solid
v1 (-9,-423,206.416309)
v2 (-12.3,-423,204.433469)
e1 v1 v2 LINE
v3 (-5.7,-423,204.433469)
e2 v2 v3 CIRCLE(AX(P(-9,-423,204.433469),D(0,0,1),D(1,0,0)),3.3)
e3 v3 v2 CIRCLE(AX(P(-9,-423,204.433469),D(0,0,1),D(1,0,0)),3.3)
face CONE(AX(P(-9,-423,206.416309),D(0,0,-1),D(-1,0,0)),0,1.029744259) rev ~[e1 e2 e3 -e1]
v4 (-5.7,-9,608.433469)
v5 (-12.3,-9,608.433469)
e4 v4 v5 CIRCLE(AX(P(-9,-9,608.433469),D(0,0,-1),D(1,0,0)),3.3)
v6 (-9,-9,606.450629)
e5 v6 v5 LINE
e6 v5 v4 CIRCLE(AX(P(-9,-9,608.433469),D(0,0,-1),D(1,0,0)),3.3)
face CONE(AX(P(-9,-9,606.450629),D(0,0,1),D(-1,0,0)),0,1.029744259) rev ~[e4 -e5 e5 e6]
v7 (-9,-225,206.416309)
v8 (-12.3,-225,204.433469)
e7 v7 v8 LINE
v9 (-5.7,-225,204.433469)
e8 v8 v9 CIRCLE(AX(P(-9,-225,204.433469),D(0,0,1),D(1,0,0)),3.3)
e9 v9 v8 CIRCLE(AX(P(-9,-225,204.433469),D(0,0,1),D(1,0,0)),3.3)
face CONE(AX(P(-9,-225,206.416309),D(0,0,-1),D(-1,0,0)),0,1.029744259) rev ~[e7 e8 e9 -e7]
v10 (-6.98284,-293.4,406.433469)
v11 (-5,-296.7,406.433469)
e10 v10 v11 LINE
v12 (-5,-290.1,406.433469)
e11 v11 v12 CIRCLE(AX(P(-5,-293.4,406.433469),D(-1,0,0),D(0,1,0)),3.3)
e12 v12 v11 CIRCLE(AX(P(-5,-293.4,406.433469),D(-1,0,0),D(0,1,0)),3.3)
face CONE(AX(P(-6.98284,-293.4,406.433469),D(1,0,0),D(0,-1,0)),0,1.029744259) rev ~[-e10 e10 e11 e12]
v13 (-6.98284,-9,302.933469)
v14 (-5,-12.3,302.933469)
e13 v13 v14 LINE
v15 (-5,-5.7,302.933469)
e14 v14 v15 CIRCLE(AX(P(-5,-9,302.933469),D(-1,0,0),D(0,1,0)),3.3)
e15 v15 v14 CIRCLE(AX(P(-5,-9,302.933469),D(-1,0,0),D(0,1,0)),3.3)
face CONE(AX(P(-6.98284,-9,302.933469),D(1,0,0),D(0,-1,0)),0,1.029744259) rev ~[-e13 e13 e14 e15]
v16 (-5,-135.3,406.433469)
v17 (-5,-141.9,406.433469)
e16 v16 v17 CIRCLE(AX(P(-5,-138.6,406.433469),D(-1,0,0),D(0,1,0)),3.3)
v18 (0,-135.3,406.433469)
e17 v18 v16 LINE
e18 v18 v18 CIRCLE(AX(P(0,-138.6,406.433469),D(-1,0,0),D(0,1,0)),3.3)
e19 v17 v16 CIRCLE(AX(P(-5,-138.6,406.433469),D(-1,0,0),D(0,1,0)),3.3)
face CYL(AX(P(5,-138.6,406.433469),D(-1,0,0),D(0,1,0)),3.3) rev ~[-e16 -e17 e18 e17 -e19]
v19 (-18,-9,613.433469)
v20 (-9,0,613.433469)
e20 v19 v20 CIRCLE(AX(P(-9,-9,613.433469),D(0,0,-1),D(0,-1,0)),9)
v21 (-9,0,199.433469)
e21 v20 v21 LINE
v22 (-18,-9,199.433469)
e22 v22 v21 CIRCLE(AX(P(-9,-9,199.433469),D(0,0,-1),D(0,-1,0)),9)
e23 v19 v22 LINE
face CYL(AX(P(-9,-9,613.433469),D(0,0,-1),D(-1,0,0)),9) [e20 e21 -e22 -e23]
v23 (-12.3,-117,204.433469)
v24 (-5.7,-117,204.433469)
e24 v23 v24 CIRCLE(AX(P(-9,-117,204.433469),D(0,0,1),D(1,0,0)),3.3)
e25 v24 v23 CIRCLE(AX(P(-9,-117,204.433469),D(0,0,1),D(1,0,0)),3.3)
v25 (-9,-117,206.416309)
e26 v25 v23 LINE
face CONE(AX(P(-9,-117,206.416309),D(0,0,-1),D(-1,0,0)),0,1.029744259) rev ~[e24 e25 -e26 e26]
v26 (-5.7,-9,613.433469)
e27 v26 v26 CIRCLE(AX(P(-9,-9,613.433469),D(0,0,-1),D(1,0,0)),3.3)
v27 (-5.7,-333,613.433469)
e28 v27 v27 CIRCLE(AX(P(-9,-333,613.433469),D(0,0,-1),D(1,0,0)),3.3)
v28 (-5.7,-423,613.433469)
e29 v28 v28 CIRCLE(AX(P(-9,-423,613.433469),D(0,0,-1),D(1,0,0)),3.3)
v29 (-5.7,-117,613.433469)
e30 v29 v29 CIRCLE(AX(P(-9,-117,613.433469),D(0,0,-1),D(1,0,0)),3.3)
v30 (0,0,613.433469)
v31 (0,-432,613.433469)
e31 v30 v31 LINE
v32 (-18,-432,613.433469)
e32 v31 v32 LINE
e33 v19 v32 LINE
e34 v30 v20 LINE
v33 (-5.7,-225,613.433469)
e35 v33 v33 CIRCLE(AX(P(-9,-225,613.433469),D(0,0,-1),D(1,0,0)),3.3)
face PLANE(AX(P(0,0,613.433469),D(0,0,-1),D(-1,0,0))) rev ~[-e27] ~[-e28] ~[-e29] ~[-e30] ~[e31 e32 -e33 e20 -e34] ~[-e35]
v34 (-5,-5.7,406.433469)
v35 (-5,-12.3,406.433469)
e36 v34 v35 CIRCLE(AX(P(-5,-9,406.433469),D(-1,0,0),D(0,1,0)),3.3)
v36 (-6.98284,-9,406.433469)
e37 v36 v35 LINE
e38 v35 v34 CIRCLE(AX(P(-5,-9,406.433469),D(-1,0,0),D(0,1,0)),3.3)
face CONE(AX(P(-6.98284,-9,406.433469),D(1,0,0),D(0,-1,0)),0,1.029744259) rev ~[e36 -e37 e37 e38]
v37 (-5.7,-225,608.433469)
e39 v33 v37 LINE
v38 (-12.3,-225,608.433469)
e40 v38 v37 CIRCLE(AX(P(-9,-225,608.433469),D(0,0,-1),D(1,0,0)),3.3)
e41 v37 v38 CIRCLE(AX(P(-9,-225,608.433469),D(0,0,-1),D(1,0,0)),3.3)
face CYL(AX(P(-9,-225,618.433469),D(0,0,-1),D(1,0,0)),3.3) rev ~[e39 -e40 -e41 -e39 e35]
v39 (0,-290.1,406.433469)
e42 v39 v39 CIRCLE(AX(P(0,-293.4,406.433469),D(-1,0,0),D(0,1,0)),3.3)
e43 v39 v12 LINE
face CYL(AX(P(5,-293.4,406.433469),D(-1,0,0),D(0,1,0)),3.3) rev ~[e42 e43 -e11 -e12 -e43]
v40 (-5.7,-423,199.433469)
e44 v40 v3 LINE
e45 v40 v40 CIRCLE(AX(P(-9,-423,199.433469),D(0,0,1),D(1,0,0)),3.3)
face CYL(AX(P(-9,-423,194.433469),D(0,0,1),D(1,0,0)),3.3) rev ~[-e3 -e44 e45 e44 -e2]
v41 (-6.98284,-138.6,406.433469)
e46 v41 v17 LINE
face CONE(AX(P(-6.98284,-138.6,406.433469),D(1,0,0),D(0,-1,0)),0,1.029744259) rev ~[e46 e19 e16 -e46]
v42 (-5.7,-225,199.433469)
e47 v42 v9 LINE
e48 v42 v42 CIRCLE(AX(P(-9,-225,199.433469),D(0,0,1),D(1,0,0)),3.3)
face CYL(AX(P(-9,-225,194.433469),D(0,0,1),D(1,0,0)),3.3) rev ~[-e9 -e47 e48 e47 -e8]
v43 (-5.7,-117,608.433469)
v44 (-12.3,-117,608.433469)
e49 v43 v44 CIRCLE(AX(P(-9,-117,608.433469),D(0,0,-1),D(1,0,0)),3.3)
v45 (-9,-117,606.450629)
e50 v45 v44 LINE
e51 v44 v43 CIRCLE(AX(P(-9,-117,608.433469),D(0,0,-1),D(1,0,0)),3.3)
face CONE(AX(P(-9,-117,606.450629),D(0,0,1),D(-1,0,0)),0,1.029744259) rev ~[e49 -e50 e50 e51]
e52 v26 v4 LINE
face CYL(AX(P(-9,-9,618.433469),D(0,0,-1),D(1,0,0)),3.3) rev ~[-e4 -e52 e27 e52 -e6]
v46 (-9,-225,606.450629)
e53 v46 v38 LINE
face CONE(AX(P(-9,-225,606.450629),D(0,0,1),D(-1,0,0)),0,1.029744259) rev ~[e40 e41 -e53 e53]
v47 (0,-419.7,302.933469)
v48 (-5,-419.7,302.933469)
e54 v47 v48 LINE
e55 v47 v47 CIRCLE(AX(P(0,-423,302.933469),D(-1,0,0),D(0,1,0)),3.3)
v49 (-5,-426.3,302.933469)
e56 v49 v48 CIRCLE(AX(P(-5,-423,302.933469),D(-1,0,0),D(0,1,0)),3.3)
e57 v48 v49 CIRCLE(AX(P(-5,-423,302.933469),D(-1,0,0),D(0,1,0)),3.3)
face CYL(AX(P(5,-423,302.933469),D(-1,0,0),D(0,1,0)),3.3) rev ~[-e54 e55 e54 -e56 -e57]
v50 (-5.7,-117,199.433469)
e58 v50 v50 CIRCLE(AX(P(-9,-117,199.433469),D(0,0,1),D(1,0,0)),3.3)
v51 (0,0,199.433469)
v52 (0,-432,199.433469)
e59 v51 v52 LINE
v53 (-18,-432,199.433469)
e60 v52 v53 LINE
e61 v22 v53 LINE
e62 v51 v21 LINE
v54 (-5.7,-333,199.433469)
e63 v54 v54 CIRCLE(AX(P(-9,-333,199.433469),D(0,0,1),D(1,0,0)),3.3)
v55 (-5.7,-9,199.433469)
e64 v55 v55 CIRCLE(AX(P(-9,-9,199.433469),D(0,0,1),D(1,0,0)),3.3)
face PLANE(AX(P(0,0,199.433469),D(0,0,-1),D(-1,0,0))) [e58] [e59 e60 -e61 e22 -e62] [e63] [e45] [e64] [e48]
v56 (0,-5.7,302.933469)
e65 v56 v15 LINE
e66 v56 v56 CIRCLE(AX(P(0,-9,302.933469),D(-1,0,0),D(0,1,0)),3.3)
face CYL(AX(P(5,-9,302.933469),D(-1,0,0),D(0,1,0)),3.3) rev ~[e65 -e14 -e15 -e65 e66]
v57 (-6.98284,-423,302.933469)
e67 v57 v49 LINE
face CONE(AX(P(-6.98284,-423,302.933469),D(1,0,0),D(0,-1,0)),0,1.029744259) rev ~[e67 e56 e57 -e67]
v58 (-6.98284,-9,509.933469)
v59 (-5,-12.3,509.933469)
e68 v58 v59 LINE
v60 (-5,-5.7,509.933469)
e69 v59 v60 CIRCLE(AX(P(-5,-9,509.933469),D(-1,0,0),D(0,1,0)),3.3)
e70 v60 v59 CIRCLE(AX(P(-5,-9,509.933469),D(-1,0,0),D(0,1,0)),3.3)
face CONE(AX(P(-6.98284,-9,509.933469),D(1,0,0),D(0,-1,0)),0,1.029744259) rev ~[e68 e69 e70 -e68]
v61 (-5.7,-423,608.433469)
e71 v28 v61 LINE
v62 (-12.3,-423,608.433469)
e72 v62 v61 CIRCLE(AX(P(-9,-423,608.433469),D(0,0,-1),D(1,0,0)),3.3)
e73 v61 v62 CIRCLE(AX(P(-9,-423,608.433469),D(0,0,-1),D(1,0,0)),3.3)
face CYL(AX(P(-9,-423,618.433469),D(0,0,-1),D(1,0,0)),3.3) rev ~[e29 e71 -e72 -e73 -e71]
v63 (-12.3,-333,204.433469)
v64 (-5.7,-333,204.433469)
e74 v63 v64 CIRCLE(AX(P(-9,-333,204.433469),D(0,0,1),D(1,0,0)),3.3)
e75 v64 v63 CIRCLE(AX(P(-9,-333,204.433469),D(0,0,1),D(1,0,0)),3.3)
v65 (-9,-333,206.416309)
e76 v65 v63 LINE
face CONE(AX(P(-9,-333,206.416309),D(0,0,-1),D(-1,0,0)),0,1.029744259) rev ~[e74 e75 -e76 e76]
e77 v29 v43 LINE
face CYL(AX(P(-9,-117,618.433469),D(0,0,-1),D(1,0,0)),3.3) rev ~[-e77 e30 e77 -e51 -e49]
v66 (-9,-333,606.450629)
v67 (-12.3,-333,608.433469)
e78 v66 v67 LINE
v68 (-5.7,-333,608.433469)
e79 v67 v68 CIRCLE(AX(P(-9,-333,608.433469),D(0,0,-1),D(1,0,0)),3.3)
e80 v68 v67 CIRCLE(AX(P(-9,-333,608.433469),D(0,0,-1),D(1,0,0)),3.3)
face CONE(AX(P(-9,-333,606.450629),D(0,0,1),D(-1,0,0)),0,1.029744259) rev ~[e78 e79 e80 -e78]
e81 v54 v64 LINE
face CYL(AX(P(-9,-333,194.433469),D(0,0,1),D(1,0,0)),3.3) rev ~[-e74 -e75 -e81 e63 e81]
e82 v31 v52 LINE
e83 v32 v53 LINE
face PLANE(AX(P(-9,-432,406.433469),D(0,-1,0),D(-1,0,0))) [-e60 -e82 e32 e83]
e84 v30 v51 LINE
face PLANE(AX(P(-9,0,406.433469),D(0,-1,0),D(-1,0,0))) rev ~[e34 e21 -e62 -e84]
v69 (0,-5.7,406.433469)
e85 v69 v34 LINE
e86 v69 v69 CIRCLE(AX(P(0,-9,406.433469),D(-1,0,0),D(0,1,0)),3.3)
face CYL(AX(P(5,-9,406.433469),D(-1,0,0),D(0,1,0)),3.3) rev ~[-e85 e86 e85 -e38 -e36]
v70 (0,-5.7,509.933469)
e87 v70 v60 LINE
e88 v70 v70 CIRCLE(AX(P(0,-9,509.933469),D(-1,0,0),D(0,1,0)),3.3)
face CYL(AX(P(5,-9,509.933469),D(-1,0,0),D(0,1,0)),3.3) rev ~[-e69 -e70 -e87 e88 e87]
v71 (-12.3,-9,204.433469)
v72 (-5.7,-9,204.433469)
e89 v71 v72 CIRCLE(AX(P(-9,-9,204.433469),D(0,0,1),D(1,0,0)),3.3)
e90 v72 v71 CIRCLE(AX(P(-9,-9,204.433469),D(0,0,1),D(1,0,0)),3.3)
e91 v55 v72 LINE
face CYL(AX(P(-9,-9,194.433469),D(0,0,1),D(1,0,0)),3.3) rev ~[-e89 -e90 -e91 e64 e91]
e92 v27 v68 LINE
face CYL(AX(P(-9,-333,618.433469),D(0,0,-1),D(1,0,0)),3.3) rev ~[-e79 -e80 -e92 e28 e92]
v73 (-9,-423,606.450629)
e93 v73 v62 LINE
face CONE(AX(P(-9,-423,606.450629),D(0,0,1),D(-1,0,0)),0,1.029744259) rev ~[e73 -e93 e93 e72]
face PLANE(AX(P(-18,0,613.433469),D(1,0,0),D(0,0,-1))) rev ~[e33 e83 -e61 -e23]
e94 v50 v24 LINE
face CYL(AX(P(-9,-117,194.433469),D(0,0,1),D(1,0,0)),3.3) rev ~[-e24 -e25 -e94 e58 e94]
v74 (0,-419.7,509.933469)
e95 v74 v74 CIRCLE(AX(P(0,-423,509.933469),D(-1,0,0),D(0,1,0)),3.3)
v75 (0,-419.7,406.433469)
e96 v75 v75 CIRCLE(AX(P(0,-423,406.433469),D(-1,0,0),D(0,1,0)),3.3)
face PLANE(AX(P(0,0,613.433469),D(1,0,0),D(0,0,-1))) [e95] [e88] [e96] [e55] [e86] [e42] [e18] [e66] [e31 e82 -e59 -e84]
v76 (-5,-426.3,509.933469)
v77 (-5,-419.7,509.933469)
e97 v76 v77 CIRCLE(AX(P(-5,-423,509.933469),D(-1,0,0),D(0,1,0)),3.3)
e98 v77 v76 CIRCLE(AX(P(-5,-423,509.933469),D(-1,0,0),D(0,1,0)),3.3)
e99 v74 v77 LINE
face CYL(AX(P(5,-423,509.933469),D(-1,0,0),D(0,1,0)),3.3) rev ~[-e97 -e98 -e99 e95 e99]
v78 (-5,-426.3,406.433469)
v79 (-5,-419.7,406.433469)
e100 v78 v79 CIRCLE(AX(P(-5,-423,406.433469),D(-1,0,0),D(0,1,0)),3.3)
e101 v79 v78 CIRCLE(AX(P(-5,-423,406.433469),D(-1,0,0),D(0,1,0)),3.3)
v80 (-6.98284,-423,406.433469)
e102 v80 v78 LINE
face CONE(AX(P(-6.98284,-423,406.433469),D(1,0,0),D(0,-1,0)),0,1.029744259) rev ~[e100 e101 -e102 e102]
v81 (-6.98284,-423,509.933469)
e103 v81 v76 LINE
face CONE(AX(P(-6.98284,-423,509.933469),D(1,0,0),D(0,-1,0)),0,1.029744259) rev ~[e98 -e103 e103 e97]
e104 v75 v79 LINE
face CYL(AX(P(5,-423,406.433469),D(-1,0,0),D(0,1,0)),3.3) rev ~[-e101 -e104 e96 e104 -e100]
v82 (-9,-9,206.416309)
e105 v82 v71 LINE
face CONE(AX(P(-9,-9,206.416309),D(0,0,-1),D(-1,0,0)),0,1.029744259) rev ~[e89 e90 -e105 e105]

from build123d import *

# Parameters (mm, degrees)
F0_W           = 18
F0_H           = 414
F1_DEPTH       = 432
F2_R           = 9
F6_D           = 6.6
F6_DEPTH       = 5
F6_TIP         = 1.9828400428
F6_ON_F3_D     = 6.6
F6_ON_F3_DEPTH = 5
F6_ON_F3_TIP   = 1.9828400428
F6_ON_F5_D     = 6.6
F6_ON_F5_DEPTH = 5
F6_ON_F5_TIP   = 1.9828400428
F7_ANGLE       = 180


# Not quite as in the source:
# - a feature names something its author has since deleted; it is built from what else it names


with BuildPart() as f1:
    # F0 (on Front) → F1 (new body)
    with BuildSketch(Plane.XZ):
        with Locations((9, -7.566531274)):
            Rectangle(F0_W, F0_H)
    extrude(amount=F1_DEPTH)

    # F2
    f2_edges = [f1.edges().sort_by_distance(p)[0] for p in [
        (18, 0, -7.566531),
    ]]
    fillet(f2_edges, radius=F2_R)

    # F6
    with Locations(Plane(origin=(0, 0, -214.566531274), x_dir=(1, 0, 0), z_dir=(0, 0, -1))):
        with Locations((9, 9), (9, 117), (9, 225), (9, 333), (9, 423)):
            Hole(F6_D / 2, depth=F6_DEPTH)
            with Locations((0, 0, -(F6_DEPTH + F6_TIP / 2))):  # 118° drill point
                Cone(0, F6_D / 2, F6_TIP, mode=Mode.SUBTRACT)

    # F6 on F3
    with Locations(Plane(origin=(0, 0, 0), x_dir=(0, -1, 0), z_dir=(-1, 0, 0))):
        with Locations((423, -111.066531274), (423, -7.566531274), (423, 95.933468726), (9, -111.066531274), (9, -7.566531274), (9, 95.933468726), (138.6, -7.566531274), (293.4, -7.566531274)):
            Hole(F6_ON_F3_D / 2, depth=F6_ON_F3_DEPTH)
            with Locations((0, 0, -(F6_ON_F3_DEPTH + F6_ON_F3_TIP / 2))):  # 118° drill point
                Cone(0, F6_ON_F3_D / 2, F6_ON_F3_TIP, mode=Mode.SUBTRACT)

    # F6 on F5
    with Locations(Plane.XY.offset(199.433468726)):
        with Locations((9, -117), (9, -225), (9, -333), (9, -9), (9, -423)):
            Hole(F6_ON_F5_D / 2, depth=F6_ON_F5_DEPTH)
            with Locations((0, 0, -(F6_ON_F5_DEPTH + F6_ON_F5_TIP / 2))):  # 118° drill point
                Cone(0, F6_ON_F5_D / 2, F6_ON_F5_TIP, mode=Mode.SUBTRACT)


with BuildPart() as f1_1:
    # F7: moved
    add(f1.part.rotate(Axis((0, -216, 199.433468726), (0, 1, 0)), F7_ANGLE))


solid = f1_1.part
